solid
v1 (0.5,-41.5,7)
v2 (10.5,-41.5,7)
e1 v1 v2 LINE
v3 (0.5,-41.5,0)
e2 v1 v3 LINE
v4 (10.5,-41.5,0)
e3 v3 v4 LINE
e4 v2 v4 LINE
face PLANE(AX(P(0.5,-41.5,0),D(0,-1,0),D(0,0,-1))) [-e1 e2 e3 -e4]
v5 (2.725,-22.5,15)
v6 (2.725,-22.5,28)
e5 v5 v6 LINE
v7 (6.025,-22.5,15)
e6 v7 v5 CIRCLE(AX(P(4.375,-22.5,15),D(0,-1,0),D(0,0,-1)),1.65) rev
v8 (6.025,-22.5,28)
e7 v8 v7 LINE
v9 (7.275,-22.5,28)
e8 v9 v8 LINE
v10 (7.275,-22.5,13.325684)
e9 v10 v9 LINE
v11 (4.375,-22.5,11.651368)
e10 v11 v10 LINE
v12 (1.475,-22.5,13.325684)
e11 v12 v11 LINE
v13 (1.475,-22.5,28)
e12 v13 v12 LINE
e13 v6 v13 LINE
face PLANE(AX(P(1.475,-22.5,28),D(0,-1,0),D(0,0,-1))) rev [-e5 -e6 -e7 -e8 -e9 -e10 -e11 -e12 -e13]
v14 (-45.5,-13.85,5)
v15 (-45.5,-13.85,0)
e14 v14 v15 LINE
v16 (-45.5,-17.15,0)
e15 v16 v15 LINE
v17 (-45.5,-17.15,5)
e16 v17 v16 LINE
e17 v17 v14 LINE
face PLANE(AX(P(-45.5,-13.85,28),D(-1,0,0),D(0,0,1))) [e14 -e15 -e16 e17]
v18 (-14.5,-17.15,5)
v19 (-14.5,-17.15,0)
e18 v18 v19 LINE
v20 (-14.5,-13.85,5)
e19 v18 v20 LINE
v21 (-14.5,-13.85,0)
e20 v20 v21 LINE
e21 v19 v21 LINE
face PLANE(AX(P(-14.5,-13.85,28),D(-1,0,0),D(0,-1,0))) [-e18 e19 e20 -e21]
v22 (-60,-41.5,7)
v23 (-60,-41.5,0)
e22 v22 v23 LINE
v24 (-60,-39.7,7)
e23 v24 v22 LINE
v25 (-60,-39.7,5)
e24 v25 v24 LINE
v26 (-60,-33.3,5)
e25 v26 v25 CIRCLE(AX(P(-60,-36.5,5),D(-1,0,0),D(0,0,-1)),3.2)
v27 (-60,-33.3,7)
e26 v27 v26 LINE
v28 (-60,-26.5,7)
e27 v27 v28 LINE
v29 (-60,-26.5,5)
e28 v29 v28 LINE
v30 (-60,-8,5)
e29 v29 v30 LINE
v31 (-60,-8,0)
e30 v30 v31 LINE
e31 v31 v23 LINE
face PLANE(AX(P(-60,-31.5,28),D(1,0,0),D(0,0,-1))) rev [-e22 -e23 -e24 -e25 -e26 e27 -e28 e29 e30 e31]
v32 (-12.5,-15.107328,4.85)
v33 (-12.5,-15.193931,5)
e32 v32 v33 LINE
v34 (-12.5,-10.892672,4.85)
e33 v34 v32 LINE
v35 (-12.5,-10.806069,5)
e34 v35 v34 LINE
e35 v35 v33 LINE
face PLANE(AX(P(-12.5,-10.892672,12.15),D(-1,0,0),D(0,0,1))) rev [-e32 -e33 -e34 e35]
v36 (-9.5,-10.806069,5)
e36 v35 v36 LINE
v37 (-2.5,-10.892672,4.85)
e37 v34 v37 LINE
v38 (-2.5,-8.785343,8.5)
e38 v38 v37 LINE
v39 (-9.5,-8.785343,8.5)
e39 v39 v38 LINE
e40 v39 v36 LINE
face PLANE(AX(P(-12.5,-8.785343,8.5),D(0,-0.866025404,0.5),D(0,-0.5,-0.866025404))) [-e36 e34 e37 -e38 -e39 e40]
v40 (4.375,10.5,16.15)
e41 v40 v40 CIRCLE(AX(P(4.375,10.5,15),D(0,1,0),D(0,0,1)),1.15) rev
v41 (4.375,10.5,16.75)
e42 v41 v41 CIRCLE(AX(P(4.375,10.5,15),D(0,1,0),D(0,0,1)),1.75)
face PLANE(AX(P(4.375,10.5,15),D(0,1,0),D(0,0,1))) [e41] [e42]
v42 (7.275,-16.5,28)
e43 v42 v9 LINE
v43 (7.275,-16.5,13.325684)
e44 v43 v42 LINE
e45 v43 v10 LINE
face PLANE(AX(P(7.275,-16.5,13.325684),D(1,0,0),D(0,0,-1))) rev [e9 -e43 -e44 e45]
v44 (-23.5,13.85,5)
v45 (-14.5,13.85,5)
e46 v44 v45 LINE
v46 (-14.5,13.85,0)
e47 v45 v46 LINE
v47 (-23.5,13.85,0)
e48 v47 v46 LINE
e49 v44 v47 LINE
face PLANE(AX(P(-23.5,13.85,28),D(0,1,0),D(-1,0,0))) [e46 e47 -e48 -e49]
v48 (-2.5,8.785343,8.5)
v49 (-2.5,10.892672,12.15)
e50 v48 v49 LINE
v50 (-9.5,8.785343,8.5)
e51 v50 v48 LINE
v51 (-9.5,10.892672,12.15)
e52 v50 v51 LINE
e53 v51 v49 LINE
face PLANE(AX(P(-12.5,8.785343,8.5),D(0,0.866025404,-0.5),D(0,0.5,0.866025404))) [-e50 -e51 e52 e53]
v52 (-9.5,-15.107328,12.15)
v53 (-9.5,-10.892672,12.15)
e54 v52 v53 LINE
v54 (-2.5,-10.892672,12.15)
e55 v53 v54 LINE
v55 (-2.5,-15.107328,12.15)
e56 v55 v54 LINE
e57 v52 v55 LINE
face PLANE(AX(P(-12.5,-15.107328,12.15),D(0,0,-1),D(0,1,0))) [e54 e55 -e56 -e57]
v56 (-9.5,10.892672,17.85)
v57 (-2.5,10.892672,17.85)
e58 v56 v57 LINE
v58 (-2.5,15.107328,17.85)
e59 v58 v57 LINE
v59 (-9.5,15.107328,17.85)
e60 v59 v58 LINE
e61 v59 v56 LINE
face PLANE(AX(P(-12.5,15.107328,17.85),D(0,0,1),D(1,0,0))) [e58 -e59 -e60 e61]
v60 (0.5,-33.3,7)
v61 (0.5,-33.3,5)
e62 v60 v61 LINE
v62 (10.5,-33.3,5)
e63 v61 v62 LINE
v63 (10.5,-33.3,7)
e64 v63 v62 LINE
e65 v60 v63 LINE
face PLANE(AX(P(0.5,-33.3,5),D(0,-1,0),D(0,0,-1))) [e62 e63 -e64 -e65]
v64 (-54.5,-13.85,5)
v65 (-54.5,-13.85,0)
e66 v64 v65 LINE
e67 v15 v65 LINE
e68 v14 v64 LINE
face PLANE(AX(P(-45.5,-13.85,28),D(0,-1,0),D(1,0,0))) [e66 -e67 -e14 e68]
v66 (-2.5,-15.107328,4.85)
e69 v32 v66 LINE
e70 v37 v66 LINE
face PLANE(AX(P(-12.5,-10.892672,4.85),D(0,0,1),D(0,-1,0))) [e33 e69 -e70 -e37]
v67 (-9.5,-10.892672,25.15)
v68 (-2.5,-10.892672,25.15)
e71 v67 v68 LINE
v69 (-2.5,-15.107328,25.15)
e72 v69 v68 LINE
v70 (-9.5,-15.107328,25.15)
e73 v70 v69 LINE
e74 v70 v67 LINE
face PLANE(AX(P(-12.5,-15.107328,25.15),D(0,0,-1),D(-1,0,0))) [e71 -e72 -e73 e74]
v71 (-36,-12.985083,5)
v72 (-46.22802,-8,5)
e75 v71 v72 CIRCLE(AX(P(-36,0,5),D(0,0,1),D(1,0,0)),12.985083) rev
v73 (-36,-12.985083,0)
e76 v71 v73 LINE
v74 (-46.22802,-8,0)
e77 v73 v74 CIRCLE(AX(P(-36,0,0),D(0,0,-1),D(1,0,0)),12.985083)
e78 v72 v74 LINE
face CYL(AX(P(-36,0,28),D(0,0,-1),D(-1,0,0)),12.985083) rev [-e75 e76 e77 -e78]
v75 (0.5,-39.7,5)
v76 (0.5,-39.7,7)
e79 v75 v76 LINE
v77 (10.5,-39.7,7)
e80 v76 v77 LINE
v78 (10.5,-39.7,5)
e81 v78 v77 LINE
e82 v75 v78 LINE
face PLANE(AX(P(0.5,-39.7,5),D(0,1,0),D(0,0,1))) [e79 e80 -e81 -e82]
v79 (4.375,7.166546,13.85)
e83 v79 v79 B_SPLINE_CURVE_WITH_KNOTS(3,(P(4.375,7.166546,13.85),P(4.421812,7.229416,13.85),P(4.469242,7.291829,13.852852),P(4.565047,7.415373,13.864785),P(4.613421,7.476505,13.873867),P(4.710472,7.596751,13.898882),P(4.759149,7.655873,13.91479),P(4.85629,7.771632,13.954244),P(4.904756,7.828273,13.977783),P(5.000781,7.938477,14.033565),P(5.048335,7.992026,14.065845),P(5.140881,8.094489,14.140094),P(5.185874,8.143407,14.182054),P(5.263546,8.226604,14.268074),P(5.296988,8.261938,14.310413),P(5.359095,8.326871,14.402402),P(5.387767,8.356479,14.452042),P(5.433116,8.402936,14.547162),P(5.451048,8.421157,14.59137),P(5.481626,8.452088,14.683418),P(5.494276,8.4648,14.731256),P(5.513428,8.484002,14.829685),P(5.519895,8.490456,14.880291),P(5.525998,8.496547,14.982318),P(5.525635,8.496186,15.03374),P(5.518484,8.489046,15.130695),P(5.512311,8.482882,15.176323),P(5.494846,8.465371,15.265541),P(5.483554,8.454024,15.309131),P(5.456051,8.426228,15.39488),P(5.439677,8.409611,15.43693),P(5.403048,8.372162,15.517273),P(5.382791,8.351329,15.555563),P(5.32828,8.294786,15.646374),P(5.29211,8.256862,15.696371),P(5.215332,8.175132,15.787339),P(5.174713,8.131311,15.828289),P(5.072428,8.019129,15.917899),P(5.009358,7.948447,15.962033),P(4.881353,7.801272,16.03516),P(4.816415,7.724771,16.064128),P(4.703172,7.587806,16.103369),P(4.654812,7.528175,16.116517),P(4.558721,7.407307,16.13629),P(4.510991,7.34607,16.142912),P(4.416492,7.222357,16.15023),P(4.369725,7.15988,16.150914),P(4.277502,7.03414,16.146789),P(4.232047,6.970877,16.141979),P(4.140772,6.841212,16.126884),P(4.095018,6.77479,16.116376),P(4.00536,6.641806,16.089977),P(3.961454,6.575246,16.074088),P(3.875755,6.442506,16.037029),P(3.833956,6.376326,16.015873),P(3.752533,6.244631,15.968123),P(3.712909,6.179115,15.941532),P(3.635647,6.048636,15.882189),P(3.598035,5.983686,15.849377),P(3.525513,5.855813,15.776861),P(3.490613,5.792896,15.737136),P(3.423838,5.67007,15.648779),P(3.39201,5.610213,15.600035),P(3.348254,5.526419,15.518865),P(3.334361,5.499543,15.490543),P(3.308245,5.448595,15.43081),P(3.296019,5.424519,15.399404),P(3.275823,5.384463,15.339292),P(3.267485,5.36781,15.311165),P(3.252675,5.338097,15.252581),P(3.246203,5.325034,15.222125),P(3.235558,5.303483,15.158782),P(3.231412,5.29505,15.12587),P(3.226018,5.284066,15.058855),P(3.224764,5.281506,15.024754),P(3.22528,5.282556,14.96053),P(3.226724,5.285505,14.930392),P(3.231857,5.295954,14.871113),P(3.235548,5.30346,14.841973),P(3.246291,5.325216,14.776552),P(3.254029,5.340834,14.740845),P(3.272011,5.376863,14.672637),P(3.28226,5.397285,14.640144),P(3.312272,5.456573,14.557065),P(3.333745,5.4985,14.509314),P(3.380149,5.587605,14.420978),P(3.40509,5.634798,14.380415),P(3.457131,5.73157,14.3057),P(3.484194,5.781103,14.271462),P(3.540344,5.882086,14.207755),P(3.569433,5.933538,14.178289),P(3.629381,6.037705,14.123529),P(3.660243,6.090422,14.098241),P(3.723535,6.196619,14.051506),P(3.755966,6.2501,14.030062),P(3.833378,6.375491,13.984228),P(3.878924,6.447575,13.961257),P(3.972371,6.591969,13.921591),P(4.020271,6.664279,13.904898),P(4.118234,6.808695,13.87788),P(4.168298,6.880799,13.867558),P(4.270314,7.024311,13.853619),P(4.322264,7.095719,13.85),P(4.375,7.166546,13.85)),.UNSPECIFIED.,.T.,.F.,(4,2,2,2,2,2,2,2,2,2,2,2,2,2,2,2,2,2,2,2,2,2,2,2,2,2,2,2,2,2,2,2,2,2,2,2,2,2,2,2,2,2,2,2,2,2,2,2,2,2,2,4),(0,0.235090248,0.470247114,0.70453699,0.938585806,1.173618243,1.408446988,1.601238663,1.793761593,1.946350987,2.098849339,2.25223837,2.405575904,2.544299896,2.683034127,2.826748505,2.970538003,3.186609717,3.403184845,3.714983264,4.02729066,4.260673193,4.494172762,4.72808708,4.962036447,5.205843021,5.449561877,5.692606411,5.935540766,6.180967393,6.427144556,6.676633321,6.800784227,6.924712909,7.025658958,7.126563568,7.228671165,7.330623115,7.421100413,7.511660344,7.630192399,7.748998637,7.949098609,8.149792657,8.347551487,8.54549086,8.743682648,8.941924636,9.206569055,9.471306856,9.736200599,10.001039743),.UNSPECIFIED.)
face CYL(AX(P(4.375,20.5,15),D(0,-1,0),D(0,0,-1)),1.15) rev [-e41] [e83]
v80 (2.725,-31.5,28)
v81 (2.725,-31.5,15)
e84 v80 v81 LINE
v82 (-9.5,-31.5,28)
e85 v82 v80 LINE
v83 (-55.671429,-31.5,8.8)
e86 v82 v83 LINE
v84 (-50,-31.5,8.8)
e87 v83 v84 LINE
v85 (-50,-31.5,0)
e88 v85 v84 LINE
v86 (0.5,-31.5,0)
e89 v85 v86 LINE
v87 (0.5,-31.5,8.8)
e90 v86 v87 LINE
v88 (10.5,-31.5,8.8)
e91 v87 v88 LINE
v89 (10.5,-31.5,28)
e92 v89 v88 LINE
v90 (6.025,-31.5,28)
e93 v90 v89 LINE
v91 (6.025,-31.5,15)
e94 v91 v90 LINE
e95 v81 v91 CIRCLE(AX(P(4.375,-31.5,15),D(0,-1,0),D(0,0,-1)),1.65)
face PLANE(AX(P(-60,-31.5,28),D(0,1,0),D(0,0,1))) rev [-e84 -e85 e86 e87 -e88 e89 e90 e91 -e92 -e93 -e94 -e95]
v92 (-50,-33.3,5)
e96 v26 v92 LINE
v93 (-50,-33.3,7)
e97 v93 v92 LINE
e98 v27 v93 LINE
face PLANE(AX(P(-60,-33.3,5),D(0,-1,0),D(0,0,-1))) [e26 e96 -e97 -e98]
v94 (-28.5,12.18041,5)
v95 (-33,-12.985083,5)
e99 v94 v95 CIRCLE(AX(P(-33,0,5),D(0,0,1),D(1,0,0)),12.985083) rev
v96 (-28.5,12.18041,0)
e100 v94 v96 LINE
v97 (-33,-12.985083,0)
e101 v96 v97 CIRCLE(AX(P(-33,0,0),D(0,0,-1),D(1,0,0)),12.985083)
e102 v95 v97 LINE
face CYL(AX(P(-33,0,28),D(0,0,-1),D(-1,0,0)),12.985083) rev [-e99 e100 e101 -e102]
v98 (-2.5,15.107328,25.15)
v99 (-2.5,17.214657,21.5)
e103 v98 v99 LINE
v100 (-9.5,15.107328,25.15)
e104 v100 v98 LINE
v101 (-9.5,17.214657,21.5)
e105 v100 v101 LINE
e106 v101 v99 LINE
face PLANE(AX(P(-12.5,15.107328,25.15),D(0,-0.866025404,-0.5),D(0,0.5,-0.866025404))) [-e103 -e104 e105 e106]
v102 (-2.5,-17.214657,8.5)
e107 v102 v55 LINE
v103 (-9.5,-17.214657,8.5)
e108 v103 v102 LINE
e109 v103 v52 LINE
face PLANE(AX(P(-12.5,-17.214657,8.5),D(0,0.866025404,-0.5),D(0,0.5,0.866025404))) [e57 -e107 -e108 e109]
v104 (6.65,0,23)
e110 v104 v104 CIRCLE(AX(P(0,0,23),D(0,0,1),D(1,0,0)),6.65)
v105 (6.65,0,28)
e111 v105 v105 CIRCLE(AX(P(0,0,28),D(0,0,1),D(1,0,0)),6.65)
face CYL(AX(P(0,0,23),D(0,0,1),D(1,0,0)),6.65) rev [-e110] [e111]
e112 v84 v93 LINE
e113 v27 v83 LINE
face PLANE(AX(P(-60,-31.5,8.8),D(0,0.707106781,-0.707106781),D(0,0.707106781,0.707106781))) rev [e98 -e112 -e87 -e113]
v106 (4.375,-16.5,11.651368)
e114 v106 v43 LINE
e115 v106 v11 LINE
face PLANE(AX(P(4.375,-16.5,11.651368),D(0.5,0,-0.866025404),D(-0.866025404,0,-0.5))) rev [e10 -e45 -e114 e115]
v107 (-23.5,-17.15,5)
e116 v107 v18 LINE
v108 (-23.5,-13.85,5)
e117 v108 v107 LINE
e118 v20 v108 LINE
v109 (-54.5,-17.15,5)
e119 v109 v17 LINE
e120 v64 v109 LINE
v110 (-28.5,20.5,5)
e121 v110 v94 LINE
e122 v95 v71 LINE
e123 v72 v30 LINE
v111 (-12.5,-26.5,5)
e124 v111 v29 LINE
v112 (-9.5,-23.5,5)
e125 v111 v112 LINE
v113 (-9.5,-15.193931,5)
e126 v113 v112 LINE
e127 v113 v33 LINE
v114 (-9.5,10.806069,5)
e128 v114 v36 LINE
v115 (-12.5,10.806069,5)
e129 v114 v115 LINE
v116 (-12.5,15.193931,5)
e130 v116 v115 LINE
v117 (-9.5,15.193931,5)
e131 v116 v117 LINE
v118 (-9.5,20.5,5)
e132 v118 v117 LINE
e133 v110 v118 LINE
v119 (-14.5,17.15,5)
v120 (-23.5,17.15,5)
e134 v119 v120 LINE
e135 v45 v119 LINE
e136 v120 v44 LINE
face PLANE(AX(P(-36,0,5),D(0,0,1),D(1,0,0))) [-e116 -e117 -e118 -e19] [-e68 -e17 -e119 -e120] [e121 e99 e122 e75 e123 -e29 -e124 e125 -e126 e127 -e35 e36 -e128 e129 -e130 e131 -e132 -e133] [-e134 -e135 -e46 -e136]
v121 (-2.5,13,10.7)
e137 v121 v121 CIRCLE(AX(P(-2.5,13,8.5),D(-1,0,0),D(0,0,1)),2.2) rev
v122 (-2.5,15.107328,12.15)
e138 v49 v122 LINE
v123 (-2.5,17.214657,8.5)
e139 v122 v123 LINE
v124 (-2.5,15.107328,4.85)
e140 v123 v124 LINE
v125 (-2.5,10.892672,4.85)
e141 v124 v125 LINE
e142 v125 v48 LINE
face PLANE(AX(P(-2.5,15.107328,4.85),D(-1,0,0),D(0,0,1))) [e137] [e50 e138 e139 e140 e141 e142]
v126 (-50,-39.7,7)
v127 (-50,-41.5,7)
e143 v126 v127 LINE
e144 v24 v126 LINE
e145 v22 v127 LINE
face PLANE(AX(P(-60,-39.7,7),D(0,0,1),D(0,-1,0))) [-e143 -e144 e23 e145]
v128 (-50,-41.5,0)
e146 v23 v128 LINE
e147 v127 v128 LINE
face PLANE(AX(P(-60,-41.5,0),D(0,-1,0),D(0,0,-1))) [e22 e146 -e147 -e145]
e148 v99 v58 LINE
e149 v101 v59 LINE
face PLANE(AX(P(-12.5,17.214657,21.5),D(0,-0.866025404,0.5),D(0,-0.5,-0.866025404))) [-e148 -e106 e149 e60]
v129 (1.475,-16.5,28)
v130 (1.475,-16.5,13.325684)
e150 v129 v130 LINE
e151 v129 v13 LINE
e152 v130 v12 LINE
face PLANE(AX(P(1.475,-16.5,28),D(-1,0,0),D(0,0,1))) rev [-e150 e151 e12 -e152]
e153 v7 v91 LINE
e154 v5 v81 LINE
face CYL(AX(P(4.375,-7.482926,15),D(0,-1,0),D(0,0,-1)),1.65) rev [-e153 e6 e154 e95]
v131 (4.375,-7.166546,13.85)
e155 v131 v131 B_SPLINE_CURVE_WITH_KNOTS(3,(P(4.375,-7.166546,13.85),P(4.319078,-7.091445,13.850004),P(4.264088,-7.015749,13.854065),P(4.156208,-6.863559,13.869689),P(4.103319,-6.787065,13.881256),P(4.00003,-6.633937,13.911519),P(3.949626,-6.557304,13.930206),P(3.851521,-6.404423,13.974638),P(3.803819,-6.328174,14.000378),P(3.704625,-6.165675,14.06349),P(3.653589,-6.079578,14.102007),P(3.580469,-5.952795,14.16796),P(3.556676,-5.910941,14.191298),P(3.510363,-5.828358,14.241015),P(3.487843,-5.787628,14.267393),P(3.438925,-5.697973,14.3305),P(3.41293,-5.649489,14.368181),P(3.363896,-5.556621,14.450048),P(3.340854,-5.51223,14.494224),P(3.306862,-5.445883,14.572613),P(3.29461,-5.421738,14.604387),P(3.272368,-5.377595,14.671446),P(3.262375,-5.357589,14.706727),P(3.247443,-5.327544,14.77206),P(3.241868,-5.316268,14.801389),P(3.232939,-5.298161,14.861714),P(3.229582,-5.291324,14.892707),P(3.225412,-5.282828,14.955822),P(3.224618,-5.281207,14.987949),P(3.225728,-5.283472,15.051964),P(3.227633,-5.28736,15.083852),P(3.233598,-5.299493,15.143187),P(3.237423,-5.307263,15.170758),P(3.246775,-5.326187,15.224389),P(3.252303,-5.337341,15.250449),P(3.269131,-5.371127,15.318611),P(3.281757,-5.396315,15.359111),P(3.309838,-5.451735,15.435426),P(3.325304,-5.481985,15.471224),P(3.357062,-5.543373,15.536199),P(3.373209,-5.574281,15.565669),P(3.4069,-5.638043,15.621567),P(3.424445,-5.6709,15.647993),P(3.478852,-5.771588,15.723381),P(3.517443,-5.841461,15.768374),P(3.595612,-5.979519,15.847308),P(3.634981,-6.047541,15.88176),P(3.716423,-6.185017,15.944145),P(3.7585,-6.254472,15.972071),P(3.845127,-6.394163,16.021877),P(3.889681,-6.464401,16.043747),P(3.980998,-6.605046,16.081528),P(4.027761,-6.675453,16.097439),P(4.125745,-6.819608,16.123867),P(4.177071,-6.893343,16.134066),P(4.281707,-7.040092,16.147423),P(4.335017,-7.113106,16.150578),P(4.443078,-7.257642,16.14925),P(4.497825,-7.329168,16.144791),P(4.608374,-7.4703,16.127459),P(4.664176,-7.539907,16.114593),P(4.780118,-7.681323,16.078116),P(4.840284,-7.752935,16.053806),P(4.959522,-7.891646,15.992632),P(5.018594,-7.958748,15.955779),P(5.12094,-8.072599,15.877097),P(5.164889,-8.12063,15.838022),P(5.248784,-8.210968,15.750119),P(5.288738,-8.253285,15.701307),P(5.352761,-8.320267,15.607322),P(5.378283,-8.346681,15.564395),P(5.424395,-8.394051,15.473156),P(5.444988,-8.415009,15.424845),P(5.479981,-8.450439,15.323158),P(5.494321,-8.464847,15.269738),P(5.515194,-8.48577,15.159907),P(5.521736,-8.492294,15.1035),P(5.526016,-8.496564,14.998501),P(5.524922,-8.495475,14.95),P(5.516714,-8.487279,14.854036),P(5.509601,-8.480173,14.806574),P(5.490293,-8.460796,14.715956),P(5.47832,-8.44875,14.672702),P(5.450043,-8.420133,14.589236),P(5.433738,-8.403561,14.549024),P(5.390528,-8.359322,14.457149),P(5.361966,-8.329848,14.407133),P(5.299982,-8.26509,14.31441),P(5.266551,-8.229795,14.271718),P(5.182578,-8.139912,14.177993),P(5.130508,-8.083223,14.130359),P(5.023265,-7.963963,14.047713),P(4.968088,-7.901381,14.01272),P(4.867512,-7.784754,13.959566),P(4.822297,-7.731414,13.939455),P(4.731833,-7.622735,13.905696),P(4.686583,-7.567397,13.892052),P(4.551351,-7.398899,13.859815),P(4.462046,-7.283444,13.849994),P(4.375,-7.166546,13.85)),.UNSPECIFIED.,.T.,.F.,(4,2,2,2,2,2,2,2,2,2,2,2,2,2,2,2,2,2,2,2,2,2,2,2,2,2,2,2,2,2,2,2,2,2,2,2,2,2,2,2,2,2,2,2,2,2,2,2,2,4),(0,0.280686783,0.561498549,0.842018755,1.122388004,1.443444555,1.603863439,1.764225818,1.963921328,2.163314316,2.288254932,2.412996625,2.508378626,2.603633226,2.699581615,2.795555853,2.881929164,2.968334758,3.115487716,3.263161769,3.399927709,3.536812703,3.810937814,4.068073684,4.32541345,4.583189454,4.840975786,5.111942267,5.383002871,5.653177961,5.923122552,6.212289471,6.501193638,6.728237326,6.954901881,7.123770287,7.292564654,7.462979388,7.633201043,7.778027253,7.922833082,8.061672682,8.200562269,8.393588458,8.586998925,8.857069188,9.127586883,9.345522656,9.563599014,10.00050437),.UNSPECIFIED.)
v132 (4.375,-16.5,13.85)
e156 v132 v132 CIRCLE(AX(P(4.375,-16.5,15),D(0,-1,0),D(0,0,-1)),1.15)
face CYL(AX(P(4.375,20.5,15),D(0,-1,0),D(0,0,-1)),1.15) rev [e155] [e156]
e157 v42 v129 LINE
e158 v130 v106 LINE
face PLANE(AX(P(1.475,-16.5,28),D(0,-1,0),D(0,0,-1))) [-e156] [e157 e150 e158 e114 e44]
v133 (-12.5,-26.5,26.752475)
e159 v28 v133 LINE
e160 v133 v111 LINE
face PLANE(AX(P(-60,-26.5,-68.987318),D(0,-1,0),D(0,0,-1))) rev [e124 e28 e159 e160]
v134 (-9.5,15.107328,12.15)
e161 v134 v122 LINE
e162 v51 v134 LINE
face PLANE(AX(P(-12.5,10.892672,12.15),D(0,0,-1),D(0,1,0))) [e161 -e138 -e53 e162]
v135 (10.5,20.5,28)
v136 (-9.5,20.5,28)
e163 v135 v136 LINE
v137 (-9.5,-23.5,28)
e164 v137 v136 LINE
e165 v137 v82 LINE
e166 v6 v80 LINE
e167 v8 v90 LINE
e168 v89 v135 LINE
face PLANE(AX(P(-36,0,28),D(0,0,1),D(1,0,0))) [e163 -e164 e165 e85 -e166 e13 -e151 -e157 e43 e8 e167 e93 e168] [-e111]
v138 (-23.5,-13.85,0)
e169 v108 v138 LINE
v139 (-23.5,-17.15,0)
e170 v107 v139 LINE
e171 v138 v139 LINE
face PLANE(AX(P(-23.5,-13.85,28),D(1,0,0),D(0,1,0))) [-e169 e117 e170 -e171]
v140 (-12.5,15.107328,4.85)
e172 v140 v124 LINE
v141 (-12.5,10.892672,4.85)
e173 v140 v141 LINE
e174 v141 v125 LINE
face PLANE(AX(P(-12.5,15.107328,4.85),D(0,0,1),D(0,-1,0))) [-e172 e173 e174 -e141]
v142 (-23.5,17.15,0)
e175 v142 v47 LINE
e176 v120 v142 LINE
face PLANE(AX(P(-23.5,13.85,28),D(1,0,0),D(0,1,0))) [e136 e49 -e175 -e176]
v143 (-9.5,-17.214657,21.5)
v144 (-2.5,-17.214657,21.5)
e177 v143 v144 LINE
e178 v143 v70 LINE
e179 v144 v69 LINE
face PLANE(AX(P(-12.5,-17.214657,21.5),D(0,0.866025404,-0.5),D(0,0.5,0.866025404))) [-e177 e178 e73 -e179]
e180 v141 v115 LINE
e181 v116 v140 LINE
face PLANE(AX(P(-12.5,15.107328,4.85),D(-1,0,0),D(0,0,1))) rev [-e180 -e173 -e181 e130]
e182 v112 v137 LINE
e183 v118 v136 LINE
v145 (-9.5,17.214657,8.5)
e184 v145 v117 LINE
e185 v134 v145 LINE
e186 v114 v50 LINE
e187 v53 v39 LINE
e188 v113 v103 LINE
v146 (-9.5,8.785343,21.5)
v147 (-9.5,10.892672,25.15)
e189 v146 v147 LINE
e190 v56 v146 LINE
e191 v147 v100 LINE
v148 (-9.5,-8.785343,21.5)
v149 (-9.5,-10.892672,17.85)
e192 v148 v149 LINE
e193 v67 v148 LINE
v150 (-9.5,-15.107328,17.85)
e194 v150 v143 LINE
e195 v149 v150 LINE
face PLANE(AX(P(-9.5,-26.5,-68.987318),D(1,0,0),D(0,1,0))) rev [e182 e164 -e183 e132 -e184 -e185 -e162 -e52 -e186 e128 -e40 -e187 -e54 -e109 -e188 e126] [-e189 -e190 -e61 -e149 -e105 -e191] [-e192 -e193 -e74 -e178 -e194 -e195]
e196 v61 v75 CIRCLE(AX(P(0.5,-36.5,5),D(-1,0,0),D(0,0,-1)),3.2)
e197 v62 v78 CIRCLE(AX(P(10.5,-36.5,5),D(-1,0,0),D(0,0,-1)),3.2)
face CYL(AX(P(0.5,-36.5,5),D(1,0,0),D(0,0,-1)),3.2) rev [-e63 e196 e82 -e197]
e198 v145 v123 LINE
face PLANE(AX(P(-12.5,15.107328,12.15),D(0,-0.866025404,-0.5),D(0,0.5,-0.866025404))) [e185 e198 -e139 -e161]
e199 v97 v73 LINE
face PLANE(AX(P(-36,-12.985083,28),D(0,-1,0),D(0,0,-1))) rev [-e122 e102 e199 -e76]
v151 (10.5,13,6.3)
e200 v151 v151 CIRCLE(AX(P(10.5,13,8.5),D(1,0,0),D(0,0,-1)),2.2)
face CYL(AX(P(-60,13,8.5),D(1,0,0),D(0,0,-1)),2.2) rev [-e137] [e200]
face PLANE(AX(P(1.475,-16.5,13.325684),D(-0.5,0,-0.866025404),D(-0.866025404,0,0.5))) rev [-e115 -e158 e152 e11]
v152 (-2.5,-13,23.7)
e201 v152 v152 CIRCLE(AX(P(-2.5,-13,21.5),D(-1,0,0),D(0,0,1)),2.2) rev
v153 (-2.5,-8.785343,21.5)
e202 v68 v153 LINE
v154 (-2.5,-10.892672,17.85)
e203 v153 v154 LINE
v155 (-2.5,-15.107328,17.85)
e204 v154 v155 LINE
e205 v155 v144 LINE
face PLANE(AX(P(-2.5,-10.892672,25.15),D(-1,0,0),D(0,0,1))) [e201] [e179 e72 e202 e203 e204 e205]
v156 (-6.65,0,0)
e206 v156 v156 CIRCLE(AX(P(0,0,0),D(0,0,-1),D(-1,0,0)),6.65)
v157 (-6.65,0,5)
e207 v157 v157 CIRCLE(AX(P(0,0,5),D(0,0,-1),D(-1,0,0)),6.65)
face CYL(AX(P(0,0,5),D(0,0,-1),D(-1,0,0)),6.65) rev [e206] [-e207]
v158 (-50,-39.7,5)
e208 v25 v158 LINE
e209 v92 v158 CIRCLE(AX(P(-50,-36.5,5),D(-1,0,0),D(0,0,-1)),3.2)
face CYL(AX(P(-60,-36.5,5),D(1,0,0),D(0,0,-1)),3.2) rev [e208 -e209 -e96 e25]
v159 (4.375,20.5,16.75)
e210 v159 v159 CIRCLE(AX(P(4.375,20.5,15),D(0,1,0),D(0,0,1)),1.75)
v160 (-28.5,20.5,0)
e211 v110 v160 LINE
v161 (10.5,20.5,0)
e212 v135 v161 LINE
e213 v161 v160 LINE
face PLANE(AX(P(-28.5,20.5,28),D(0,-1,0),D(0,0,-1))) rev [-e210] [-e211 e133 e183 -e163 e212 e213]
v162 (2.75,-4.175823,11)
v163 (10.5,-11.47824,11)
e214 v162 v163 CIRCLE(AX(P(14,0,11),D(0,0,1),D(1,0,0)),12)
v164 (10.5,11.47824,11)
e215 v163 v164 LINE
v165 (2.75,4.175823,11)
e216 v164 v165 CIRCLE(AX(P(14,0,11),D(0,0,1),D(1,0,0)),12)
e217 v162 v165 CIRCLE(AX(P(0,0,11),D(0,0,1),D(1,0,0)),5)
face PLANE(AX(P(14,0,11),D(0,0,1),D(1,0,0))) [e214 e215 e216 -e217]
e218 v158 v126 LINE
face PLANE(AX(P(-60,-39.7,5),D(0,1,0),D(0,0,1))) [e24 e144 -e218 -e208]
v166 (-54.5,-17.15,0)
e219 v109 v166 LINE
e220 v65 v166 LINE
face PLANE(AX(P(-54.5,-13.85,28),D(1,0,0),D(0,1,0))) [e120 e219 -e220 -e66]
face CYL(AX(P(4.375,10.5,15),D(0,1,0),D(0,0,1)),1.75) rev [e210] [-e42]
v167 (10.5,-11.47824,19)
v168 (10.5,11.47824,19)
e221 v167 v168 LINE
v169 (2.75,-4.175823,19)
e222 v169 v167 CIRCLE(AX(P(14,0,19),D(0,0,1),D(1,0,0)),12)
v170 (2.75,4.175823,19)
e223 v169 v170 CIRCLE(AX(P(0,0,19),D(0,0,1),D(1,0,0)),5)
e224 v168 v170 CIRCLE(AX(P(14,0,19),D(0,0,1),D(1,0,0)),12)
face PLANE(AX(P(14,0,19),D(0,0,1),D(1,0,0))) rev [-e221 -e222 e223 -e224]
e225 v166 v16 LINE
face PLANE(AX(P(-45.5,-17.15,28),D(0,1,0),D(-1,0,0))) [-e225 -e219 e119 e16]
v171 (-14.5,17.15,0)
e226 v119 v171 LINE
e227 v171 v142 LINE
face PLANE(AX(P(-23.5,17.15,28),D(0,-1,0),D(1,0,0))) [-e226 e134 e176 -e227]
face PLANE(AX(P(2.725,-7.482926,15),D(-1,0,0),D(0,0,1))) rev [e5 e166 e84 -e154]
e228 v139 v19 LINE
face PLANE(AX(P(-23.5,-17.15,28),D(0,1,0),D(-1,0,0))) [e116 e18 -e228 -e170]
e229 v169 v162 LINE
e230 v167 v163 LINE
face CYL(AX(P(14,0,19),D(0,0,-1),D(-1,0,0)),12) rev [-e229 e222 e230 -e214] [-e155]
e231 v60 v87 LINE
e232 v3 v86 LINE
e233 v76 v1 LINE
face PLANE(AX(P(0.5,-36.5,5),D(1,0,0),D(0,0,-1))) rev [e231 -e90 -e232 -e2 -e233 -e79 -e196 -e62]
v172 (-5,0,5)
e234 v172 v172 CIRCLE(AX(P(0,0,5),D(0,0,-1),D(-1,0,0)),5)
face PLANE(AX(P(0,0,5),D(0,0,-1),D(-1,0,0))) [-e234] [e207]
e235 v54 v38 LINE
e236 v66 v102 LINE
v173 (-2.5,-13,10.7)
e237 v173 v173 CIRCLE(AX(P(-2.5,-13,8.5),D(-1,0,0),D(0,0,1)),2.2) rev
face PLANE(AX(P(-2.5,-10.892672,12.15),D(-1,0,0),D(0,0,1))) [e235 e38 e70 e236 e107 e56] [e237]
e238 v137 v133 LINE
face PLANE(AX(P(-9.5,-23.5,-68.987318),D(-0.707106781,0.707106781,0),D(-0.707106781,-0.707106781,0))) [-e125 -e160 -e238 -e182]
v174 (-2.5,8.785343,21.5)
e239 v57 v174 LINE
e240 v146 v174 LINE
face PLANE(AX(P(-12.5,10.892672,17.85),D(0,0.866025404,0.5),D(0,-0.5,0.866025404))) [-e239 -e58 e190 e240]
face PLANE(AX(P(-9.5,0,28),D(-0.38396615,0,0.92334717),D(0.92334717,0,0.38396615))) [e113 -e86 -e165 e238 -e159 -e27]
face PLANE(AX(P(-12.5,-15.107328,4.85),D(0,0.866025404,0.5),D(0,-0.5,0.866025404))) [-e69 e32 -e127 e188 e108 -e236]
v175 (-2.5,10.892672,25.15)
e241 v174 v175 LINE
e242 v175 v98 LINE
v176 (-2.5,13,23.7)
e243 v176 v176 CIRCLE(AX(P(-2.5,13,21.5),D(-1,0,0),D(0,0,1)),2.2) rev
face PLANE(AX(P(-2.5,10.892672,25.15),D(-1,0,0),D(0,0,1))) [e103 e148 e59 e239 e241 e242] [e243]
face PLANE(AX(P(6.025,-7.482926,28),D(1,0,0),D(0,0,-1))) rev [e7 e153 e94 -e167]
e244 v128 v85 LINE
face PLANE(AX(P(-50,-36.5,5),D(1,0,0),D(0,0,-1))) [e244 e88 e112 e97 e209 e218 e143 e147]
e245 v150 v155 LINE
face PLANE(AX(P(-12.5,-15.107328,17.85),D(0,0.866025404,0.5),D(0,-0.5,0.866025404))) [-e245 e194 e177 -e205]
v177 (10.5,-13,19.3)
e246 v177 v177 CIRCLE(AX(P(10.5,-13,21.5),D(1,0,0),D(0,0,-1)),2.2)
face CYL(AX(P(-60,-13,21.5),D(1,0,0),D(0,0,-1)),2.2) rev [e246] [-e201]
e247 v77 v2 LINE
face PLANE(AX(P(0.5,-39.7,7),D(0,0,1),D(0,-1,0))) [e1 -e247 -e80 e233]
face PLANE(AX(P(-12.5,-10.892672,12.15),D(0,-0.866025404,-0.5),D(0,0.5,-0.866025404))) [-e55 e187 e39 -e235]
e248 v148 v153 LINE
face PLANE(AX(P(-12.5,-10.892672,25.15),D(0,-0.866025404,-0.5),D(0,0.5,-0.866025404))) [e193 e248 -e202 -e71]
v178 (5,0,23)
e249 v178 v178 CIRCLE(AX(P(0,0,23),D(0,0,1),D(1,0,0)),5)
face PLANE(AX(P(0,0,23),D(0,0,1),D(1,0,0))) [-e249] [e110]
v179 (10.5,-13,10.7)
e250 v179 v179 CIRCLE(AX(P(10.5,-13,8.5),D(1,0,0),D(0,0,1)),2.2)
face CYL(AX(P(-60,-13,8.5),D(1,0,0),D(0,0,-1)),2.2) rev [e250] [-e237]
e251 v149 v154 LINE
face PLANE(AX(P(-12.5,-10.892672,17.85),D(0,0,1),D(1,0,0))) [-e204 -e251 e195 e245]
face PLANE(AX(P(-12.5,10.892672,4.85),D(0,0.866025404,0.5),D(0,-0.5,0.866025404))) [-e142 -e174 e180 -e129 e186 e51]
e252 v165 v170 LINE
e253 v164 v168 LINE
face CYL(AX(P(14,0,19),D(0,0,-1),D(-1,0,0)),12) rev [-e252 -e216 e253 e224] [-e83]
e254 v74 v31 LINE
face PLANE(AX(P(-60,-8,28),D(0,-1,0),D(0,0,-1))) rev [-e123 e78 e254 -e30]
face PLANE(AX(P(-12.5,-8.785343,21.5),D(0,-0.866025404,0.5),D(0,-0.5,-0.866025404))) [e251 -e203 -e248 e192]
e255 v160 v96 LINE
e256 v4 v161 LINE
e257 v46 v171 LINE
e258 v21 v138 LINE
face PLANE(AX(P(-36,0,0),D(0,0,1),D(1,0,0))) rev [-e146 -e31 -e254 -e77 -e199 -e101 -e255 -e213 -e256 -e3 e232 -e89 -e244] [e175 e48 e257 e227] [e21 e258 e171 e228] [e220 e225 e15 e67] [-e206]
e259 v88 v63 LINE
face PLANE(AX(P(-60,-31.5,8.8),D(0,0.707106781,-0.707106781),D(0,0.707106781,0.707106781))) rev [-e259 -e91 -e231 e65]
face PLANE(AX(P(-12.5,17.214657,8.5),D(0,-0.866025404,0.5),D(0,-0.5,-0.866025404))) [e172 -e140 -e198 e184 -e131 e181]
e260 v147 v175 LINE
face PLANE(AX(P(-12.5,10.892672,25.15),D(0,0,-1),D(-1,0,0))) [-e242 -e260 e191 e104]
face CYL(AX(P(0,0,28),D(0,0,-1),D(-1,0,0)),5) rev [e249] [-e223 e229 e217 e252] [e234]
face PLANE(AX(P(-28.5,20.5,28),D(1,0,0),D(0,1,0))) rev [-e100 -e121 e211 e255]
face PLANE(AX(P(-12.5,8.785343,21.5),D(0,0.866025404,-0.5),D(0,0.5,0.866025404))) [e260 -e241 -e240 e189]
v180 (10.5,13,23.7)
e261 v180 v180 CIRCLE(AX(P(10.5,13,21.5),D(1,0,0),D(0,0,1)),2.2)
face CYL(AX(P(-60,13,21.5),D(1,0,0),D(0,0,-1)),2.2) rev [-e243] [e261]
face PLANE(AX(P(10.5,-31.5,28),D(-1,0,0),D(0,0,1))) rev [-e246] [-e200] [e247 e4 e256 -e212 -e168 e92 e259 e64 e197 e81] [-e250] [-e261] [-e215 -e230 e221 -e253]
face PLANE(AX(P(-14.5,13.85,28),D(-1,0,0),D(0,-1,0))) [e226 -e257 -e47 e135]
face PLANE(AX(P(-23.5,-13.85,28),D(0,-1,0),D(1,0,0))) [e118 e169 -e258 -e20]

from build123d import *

# Parameters (mm, degrees)
SKETCH1_R               = 5
SKETCH1_W               = 9
SKETCH1_H               = 3.3
BOSS_EXTRUDE1_DEPTH     = 28
SKETCH2_W               = 50.5
SKETCH2_H               = 47
CUT_EXTRUDE1_DEPTH      = 23
SKETCH3_R               = 6.65
CUT_EXTRUDE2_DEPTH      = 5
CUT_EXTRUDE3_START      = -5
SKETCH4_R               = 6.65
CUT_EXTRUDE3_DEPTH      = 5
SKETCH5_R               = 12
CUT_EXTRUDE4_DEPTH      = 8
CUT_EXTRUDE5_START      = -9
CUT_EXTRUDE5_DEPTH      = 9
CUT_EXTRUDE6_DEPTH      = 6
SKETCH8_R               = 1.15
CUT_EXTRUDE7_DEPTH      = 85.190260719
CHAMFER1_SIZE           = 21
CHAMFER1_SIZE2          = 50.5
SKETCH9_R               = 2.2
CUT_EXTRUDE8_DEPTH      = 83.137080542
CUT_EXTRUDE9_DEPTH      = 3
CUT_EXTRUDE9_DEPTH_BACK = 7
BOSS_EXTRUDE2_DEPTH     = 10
LPATTERN1_COUNT         = 2
LPATTERN1_PITCH         = 60.5
SKETCH12_R              = 1.75
CUT_EXTRUDE10_DEPTH     = 10
CHAMFER2_SIZE           = 3
CHAMFER3_SIZE           = 1.8


with BuildPart() as part:
    # Sketch1 → Boss-Extrude1 (new body)
    with BuildSketch(Plane.XY):
        with BuildLine():
            Line((-60, -31.5), (10.5, -31.5))
            Line((10.5, -31.5), (10.5, 20.5))
            Line((10.5, 20.5), (-28.5, 20.5))
            Line((-28.5, 20.5), (-28.5, 12.180409823))
            ThreePointArc((-28.5, 12.180409823), (-20.217668105, -2.285689125), (-33, -12.985083113))
            Line((-33, -12.985083113), (-36, -12.985083113))
            ThreePointArc((-36, -12.985083113), (-41.689100041, -11.672468641), (-46.228019527, -8))
            Line((-46.228019527, -8), (-60, -8))
            Line((-60, -8), (-60, -31.5))
        make_face()
        Circle(SKETCH1_R, mode=Mode.SUBTRACT)
        with Locations((-19, 15.5)):
            Rectangle(SKETCH1_W, SKETCH1_H, mode=Mode.SUBTRACT)
        with Locations((-19, -15.5)):
            Rectangle(SKETCH1_W, SKETCH1_H, mode=Mode.SUBTRACT)
        with Locations((-50, -15.5)):
            Rectangle(SKETCH1_W, SKETCH1_H, mode=Mode.SUBTRACT)
    extrude(amount=BOSS_EXTRUDE1_DEPTH)

    # Sketch2 → Cut-Extrude1 (cut)
    with BuildSketch(Plane.XY.offset(28)):
        with Locations((-34.75, -3)):
            Rectangle(SKETCH2_W, SKETCH2_H)
    extrude(amount=-CUT_EXTRUDE1_DEPTH, mode=Mode.SUBTRACT)

    # Sketch3 → Cut-Extrude2 (cut)
    with BuildSketch(Plane.XY.offset(28)):
        Circle(SKETCH3_R)
    extrude(amount=-CUT_EXTRUDE2_DEPTH, mode=Mode.SUBTRACT)

    # Sketch4 → Cut-Extrude3 (cut)
    with BuildSketch(Plane(origin=(0, 0, 0), x_dir=(-1, 0, 0), z_dir=(0, 0, -1)).offset(CUT_EXTRUDE3_START)):
        with Locations(Location((0, 0, 0), (0, 0, 180))):
            Circle(SKETCH4_R)
    extrude(amount=CUT_EXTRUDE3_DEPTH, mode=Mode.SUBTRACT)

    # Sketch5 → Cut-Extrude4 (cut)
    with BuildSketch(Plane.XY.offset(11)):
        with Locations((14, 0)):
            Circle(SKETCH5_R)
    extrude(amount=CUT_EXTRUDE4_DEPTH, mode=Mode.SUBTRACT)

    # Sketch6 → Cut-Extrude5 (cut)
    with BuildSketch(Plane.XZ.offset(31.5).offset(CUT_EXTRUDE5_START)):
        with BuildLine():
            Line((2.725, 15), (2.725, 28))
            Line((2.725, 28), (6.025, 28))
            Line((6.025, 28), (6.025, 15))
            ThreePointArc((6.025, 15), (4.375, 13.35), (2.725, 15))
        make_face()
    extrude(amount=CUT_EXTRUDE5_DEPTH, mode=Mode.SUBTRACT)

    # Sketch7 → Cut-Extrude6 (cut)
    with BuildSketch(Plane.XZ.offset(22.5)):
        Polygon((1.475, 28), (7.275, 28), (7.275, 13.325684219), (4.375, 11.651368439), (1.475, 13.325684219), align=None)
    extrude(amount=-CUT_EXTRUDE6_DEPTH, mode=Mode.SUBTRACT)

    # Sketch8 → Cut-Extrude7 (cut, through all)
    with BuildSketch(Plane.XZ.offset(31.5)):
        with Locations(Location((4.375, 15, 0), (0, 0, 270))):
            Circle(SKETCH8_R)
    extrude(amount=-CUT_EXTRUDE7_DEPTH, mode=Mode.SUBTRACT)

    # Chamfer1
    chamfer1_edges = [part.edges().sort_by_distance(p)[0] for p in [
        (-60, -29, 28),
    ]]
    chamfer1_side = [part.faces().sort_by_distance(p)[0] for p in [
        (-60, -19.75, 0.365547535),
    ]]
    chamfer(chamfer1_edges, length=CHAMFER1_SIZE, length2=CHAMFER1_SIZE2, reference=chamfer1_side[0])

    # Sketch9 → Cut-Extrude8 (cut, through all)
    with BuildSketch(Plane(origin=(10.5, 0, 0), x_dir=(0, 0, -1), z_dir=(1, 0, 0))):
        with Locations((-8.5, 13)):
            Circle(SKETCH9_R)
        with Locations(Location((-21.5, 13, 0), (0, 0, 90))):
            Circle(SKETCH9_R)
        with Locations(Location((-8.5, -13, 0), (0, 0, 90))):
            Circle(SKETCH9_R)
        with Locations((-21.5, -13)):
            Circle(SKETCH9_R)
    extrude(amount=-CUT_EXTRUDE8_DEPTH, mode=Mode.SUBTRACT)

    # Sketch10 → Cut-Extrude9 (cut, two sides: drawn at the far end of the back side and taken through both)
    with BuildSketch(Plane.ZY.offset(9.5).offset(-CUT_EXTRUDE9_DEPTH_BACK)):
        Polygon((4.85, 15.107328483), (4.85, 10.892671517), (8.5, 8.785343035), (12.15, 10.892671517), (12.15, 15.107328483), (8.5, 17.214656965), align=None)
        Polygon((25.15, 10.892671517), (25.15, 15.107328483), (21.5, 17.214656965), (17.85, 15.107328483), (17.85, 10.892671517), (21.5, 8.785343035), align=None)
        Polygon((25.15, -10.892671517), (21.5, -8.785343035), (17.85, -10.892671517), (17.85, -15.107328483), (21.5, -17.214656965), (25.15, -15.107328483), align=None)
        Polygon((12.15, -10.892671517), (8.5, -8.785343035), (4.85, -10.892671517), (4.85, -15.107328483), (8.5, -17.214656965), (12.15, -15.107328483), align=None)
    extrude(amount=CUT_EXTRUDE9_DEPTH + CUT_EXTRUDE9_DEPTH_BACK, mode=Mode.SUBTRACT)

    # Sketch11 → Boss-Extrude2 (add)
    with BuildSketch(Plane(origin=(10.5, 0, 0), x_dir=(0, 0, -1), z_dir=(1, 0, 0))):
        with BuildLine():
            Line((0, -31.5), (-7, -31.5))
            Line((-7, -31.5), (-7, -33.3))
            Line((-7, -33.3), (-5, -33.3))
            ThreePointArc((-5, -33.3), (-1.8, -36.5), (-5, -39.7))
            Line((-5, -39.7), (-7, -39.7))
            Line((-7, -39.7), (-7, -41.5))
            Line((-7, -41.5), (0, -41.5))
            Line((0, -41.5), (0, -31.5))
        make_face()
    boss_extrude2 = extrude(amount=-BOSS_EXTRUDE2_DEPTH)

    # LPattern1: Boss-Extrude2 ×2
    with Locations(*[(-i * LPATTERN1_PITCH, 0, 0) for i in range(1, LPATTERN1_COUNT)]):
        add(boss_extrude2)

    # Sketch12 → Cut-Extrude10 (cut)
    with BuildSketch(Plane(origin=(0, 20.5, 0), x_dir=(1, 0, 0), z_dir=(0, 1, 0))):
        with Locations(Location((4.375, -15, 0), (0, 0, 270))):
            Circle(SKETCH12_R)
    extrude(amount=-CUT_EXTRUDE10_DEPTH, mode=Mode.SUBTRACT)

    # Chamfer2
    chamfer2_edges = [part.edges().sort_by_distance(p)[0] for p in [
        (-9.5, -26.5, 16.5),
    ]]
    chamfer(chamfer2_edges, length=CHAMFER2_SIZE)

    # Chamfer3
    chamfer3_edges = [part.edges().sort_by_distance(p)[0] for p in [
        (-55, -31.5, 7),
        (5.5, -31.5, 7),
    ]]
    chamfer(chamfer3_edges, length=CHAMFER3_SIZE - 0.0001)  # a hair under: the kernel refuses the full size


solid = part.part
